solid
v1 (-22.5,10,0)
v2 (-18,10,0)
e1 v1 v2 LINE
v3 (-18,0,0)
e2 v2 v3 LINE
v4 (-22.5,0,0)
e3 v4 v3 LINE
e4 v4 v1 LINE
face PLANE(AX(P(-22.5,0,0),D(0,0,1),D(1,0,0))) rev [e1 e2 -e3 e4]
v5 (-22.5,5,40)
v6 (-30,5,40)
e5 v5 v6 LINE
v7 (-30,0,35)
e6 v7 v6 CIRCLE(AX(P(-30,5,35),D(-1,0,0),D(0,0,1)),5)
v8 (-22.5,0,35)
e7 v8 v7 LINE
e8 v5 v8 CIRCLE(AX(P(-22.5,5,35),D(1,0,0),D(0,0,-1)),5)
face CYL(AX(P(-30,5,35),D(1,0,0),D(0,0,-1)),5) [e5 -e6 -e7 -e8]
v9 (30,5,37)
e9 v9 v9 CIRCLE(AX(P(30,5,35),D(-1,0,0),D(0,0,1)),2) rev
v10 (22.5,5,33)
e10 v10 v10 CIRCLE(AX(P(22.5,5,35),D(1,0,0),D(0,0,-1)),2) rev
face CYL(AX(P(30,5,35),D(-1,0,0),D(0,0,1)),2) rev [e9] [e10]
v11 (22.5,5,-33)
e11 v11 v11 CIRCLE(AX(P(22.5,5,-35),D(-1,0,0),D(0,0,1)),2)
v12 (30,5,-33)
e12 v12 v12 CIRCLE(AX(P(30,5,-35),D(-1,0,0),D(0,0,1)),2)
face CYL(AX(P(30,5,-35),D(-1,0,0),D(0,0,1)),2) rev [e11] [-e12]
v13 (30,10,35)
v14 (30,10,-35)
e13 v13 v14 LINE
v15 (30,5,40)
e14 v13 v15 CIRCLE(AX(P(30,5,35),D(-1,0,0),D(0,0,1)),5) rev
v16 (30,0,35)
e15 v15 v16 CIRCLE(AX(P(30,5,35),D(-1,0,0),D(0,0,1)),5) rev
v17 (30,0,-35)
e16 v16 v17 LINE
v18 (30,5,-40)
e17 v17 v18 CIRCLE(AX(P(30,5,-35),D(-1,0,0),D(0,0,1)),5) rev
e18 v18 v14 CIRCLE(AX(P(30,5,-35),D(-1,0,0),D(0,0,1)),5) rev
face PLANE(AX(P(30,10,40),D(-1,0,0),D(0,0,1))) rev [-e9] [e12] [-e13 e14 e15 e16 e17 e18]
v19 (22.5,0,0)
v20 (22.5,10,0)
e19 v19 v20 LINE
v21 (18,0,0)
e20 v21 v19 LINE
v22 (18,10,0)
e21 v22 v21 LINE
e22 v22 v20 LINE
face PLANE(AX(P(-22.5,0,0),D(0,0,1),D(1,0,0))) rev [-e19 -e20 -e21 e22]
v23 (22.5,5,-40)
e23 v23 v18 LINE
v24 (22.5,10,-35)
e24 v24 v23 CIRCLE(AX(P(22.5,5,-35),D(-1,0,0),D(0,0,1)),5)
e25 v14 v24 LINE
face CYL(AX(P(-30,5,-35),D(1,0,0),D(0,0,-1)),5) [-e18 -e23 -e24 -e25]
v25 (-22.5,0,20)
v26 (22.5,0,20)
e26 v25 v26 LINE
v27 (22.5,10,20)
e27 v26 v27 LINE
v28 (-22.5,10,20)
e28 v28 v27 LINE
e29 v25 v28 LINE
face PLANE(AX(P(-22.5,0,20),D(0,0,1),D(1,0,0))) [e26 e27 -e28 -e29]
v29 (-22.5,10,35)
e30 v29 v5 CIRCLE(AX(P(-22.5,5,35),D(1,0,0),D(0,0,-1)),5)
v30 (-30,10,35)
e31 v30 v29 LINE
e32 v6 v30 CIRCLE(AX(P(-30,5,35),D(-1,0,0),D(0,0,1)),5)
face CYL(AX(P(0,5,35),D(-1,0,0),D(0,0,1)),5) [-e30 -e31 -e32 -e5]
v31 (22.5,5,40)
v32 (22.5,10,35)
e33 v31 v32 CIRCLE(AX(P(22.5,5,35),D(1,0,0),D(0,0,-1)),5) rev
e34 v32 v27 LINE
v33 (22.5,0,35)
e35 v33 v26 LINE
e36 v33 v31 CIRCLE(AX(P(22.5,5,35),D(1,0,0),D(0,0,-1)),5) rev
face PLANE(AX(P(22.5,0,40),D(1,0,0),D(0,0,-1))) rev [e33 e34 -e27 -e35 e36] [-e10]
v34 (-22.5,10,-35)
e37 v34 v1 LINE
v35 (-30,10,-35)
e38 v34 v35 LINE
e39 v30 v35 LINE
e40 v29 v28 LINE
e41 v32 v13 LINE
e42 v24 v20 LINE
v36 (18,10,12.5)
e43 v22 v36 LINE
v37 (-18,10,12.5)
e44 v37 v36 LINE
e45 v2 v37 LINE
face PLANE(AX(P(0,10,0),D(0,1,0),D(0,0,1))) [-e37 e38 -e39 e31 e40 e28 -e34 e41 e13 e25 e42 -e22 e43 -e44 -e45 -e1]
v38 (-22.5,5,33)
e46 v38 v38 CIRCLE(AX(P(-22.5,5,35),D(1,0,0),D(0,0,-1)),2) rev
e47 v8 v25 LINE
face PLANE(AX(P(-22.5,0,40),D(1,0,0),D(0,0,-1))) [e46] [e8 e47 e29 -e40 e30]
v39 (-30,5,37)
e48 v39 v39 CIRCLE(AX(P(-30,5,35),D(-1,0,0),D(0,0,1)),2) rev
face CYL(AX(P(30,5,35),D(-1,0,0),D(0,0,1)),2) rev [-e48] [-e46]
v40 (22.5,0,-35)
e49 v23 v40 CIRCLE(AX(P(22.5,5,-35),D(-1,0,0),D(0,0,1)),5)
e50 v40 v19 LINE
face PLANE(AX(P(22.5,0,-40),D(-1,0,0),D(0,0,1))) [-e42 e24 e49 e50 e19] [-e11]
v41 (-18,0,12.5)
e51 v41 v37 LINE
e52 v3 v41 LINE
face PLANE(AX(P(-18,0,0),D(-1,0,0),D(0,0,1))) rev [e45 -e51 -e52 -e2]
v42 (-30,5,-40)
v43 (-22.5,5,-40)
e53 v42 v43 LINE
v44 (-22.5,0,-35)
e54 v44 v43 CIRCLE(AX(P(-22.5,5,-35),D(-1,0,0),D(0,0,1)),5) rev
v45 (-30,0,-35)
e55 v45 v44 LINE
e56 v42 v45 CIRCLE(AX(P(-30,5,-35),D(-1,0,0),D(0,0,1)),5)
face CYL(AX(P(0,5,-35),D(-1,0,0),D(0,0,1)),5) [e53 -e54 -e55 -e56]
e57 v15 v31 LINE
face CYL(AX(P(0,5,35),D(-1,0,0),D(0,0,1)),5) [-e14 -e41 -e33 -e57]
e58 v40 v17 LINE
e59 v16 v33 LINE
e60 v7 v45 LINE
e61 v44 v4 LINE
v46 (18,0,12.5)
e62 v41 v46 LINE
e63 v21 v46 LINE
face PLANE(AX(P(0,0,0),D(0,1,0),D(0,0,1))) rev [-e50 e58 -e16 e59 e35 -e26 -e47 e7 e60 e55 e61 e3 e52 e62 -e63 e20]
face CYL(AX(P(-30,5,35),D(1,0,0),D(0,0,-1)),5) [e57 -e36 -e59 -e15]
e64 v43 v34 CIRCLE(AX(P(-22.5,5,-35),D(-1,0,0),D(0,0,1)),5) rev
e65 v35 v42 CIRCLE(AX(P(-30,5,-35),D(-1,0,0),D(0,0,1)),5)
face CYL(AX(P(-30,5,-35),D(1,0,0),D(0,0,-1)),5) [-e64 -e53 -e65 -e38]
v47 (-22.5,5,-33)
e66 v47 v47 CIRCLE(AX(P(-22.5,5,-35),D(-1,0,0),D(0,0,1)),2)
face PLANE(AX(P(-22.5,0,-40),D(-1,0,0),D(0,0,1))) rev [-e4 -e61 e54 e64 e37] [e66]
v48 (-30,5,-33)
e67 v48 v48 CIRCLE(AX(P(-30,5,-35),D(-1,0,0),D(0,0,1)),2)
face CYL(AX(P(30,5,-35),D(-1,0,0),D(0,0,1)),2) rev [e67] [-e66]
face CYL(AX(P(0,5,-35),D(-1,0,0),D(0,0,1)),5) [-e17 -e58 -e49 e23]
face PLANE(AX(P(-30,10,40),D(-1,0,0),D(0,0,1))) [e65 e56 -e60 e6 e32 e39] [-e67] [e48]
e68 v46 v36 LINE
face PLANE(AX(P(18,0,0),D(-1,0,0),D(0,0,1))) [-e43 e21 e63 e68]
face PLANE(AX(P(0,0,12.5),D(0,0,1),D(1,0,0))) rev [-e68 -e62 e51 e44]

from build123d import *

# Parameters (mm, degrees)
SKETCH1_W           = 60
SKETCH1_H           = 80
BOSS_EXTRUDE1_DEPTH = 10
SKETCH3_W           = 45
SKETCH3_H           = 40
CUT_EXTRUDE1_DEPTH  = 51.990195136
SKETCH4_W           = 45
SKETCH4_H           = 20
CUT_EXTRUDE2_DEPTH  = 51.990195136
SKETCH5_R           = 2
CUT_EXTRUDE3_DEPTH  = 73.801098893
FILLET1_R           = 5
SKETCH6_W           = 36
SKETCH6_H           = 25
CUT_EXTRUDE4_DEPTH  = 51.990195136


with BuildPart() as part:
    # Sketch1 → Boss-Extrude1 (new body)
    with BuildSketch(Plane(origin=(0, 0, 0), x_dir=(1, 0, 0), z_dir=(0, 1, 0))):
        Rectangle(SKETCH1_W, SKETCH1_H)
    extrude(amount=BOSS_EXTRUDE1_DEPTH)

    # Sketch3 → Cut-Extrude1 (cut, through all)
    with BuildSketch(Plane(origin=(0, 10, 0), x_dir=(1, 0, 0), z_dir=(0, 1, 0))):
        with Locations((0, 20)):
            Rectangle(SKETCH3_W, SKETCH3_H)
    extrude(amount=-CUT_EXTRUDE1_DEPTH, mode=Mode.SUBTRACT)

    # Sketch4 → Cut-Extrude2 (cut, through all)
    with BuildSketch(Plane(origin=(0, 10, 0), x_dir=(1, 0, 0), z_dir=(0, 1, 0))):
        with Locations((0, -30)):
            Rectangle(SKETCH4_W, SKETCH4_H)
    extrude(amount=-CUT_EXTRUDE2_DEPTH, mode=Mode.SUBTRACT)

    # Sketch5 → Cut-Extrude3 (cut, through all)
    with BuildSketch(Plane.ZY.offset(30)):
        with Locations((35, 5)):
            Circle(SKETCH5_R)
        with Locations((-35, 5)):
            Circle(SKETCH5_R)
    extrude(amount=-CUT_EXTRUDE3_DEPTH, mode=Mode.SUBTRACT)

    # Fillet1
    fillet1_edges = [part.edges().sort_by_distance(p)[0] for p in [
        (26.25, 0, 40),
        (-26.25, 0, 40),
        (-26.25, 0, -40),
        (26.25, 0, -40),
        (-26.25, 10, -40),
        (-26.25, 10, 40),
        (26.25, 10, 40),
        (26.25, 10, -40),
    ]]
    fillet(fillet1_edges, radius=FILLET1_R - 0.0001)  # a hair under: the kernel refuses the full size

    # Sketch6 → Cut-Extrude4 (cut, through all)
    with BuildSketch(Plane(origin=(0, 10, 0), x_dir=(1, 0, 0), z_dir=(0, 1, 0))):
        Rectangle(SKETCH6_W, SKETCH6_H)
    extrude(amount=-CUT_EXTRUDE4_DEPTH, mode=Mode.SUBTRACT)


solid = part.part
